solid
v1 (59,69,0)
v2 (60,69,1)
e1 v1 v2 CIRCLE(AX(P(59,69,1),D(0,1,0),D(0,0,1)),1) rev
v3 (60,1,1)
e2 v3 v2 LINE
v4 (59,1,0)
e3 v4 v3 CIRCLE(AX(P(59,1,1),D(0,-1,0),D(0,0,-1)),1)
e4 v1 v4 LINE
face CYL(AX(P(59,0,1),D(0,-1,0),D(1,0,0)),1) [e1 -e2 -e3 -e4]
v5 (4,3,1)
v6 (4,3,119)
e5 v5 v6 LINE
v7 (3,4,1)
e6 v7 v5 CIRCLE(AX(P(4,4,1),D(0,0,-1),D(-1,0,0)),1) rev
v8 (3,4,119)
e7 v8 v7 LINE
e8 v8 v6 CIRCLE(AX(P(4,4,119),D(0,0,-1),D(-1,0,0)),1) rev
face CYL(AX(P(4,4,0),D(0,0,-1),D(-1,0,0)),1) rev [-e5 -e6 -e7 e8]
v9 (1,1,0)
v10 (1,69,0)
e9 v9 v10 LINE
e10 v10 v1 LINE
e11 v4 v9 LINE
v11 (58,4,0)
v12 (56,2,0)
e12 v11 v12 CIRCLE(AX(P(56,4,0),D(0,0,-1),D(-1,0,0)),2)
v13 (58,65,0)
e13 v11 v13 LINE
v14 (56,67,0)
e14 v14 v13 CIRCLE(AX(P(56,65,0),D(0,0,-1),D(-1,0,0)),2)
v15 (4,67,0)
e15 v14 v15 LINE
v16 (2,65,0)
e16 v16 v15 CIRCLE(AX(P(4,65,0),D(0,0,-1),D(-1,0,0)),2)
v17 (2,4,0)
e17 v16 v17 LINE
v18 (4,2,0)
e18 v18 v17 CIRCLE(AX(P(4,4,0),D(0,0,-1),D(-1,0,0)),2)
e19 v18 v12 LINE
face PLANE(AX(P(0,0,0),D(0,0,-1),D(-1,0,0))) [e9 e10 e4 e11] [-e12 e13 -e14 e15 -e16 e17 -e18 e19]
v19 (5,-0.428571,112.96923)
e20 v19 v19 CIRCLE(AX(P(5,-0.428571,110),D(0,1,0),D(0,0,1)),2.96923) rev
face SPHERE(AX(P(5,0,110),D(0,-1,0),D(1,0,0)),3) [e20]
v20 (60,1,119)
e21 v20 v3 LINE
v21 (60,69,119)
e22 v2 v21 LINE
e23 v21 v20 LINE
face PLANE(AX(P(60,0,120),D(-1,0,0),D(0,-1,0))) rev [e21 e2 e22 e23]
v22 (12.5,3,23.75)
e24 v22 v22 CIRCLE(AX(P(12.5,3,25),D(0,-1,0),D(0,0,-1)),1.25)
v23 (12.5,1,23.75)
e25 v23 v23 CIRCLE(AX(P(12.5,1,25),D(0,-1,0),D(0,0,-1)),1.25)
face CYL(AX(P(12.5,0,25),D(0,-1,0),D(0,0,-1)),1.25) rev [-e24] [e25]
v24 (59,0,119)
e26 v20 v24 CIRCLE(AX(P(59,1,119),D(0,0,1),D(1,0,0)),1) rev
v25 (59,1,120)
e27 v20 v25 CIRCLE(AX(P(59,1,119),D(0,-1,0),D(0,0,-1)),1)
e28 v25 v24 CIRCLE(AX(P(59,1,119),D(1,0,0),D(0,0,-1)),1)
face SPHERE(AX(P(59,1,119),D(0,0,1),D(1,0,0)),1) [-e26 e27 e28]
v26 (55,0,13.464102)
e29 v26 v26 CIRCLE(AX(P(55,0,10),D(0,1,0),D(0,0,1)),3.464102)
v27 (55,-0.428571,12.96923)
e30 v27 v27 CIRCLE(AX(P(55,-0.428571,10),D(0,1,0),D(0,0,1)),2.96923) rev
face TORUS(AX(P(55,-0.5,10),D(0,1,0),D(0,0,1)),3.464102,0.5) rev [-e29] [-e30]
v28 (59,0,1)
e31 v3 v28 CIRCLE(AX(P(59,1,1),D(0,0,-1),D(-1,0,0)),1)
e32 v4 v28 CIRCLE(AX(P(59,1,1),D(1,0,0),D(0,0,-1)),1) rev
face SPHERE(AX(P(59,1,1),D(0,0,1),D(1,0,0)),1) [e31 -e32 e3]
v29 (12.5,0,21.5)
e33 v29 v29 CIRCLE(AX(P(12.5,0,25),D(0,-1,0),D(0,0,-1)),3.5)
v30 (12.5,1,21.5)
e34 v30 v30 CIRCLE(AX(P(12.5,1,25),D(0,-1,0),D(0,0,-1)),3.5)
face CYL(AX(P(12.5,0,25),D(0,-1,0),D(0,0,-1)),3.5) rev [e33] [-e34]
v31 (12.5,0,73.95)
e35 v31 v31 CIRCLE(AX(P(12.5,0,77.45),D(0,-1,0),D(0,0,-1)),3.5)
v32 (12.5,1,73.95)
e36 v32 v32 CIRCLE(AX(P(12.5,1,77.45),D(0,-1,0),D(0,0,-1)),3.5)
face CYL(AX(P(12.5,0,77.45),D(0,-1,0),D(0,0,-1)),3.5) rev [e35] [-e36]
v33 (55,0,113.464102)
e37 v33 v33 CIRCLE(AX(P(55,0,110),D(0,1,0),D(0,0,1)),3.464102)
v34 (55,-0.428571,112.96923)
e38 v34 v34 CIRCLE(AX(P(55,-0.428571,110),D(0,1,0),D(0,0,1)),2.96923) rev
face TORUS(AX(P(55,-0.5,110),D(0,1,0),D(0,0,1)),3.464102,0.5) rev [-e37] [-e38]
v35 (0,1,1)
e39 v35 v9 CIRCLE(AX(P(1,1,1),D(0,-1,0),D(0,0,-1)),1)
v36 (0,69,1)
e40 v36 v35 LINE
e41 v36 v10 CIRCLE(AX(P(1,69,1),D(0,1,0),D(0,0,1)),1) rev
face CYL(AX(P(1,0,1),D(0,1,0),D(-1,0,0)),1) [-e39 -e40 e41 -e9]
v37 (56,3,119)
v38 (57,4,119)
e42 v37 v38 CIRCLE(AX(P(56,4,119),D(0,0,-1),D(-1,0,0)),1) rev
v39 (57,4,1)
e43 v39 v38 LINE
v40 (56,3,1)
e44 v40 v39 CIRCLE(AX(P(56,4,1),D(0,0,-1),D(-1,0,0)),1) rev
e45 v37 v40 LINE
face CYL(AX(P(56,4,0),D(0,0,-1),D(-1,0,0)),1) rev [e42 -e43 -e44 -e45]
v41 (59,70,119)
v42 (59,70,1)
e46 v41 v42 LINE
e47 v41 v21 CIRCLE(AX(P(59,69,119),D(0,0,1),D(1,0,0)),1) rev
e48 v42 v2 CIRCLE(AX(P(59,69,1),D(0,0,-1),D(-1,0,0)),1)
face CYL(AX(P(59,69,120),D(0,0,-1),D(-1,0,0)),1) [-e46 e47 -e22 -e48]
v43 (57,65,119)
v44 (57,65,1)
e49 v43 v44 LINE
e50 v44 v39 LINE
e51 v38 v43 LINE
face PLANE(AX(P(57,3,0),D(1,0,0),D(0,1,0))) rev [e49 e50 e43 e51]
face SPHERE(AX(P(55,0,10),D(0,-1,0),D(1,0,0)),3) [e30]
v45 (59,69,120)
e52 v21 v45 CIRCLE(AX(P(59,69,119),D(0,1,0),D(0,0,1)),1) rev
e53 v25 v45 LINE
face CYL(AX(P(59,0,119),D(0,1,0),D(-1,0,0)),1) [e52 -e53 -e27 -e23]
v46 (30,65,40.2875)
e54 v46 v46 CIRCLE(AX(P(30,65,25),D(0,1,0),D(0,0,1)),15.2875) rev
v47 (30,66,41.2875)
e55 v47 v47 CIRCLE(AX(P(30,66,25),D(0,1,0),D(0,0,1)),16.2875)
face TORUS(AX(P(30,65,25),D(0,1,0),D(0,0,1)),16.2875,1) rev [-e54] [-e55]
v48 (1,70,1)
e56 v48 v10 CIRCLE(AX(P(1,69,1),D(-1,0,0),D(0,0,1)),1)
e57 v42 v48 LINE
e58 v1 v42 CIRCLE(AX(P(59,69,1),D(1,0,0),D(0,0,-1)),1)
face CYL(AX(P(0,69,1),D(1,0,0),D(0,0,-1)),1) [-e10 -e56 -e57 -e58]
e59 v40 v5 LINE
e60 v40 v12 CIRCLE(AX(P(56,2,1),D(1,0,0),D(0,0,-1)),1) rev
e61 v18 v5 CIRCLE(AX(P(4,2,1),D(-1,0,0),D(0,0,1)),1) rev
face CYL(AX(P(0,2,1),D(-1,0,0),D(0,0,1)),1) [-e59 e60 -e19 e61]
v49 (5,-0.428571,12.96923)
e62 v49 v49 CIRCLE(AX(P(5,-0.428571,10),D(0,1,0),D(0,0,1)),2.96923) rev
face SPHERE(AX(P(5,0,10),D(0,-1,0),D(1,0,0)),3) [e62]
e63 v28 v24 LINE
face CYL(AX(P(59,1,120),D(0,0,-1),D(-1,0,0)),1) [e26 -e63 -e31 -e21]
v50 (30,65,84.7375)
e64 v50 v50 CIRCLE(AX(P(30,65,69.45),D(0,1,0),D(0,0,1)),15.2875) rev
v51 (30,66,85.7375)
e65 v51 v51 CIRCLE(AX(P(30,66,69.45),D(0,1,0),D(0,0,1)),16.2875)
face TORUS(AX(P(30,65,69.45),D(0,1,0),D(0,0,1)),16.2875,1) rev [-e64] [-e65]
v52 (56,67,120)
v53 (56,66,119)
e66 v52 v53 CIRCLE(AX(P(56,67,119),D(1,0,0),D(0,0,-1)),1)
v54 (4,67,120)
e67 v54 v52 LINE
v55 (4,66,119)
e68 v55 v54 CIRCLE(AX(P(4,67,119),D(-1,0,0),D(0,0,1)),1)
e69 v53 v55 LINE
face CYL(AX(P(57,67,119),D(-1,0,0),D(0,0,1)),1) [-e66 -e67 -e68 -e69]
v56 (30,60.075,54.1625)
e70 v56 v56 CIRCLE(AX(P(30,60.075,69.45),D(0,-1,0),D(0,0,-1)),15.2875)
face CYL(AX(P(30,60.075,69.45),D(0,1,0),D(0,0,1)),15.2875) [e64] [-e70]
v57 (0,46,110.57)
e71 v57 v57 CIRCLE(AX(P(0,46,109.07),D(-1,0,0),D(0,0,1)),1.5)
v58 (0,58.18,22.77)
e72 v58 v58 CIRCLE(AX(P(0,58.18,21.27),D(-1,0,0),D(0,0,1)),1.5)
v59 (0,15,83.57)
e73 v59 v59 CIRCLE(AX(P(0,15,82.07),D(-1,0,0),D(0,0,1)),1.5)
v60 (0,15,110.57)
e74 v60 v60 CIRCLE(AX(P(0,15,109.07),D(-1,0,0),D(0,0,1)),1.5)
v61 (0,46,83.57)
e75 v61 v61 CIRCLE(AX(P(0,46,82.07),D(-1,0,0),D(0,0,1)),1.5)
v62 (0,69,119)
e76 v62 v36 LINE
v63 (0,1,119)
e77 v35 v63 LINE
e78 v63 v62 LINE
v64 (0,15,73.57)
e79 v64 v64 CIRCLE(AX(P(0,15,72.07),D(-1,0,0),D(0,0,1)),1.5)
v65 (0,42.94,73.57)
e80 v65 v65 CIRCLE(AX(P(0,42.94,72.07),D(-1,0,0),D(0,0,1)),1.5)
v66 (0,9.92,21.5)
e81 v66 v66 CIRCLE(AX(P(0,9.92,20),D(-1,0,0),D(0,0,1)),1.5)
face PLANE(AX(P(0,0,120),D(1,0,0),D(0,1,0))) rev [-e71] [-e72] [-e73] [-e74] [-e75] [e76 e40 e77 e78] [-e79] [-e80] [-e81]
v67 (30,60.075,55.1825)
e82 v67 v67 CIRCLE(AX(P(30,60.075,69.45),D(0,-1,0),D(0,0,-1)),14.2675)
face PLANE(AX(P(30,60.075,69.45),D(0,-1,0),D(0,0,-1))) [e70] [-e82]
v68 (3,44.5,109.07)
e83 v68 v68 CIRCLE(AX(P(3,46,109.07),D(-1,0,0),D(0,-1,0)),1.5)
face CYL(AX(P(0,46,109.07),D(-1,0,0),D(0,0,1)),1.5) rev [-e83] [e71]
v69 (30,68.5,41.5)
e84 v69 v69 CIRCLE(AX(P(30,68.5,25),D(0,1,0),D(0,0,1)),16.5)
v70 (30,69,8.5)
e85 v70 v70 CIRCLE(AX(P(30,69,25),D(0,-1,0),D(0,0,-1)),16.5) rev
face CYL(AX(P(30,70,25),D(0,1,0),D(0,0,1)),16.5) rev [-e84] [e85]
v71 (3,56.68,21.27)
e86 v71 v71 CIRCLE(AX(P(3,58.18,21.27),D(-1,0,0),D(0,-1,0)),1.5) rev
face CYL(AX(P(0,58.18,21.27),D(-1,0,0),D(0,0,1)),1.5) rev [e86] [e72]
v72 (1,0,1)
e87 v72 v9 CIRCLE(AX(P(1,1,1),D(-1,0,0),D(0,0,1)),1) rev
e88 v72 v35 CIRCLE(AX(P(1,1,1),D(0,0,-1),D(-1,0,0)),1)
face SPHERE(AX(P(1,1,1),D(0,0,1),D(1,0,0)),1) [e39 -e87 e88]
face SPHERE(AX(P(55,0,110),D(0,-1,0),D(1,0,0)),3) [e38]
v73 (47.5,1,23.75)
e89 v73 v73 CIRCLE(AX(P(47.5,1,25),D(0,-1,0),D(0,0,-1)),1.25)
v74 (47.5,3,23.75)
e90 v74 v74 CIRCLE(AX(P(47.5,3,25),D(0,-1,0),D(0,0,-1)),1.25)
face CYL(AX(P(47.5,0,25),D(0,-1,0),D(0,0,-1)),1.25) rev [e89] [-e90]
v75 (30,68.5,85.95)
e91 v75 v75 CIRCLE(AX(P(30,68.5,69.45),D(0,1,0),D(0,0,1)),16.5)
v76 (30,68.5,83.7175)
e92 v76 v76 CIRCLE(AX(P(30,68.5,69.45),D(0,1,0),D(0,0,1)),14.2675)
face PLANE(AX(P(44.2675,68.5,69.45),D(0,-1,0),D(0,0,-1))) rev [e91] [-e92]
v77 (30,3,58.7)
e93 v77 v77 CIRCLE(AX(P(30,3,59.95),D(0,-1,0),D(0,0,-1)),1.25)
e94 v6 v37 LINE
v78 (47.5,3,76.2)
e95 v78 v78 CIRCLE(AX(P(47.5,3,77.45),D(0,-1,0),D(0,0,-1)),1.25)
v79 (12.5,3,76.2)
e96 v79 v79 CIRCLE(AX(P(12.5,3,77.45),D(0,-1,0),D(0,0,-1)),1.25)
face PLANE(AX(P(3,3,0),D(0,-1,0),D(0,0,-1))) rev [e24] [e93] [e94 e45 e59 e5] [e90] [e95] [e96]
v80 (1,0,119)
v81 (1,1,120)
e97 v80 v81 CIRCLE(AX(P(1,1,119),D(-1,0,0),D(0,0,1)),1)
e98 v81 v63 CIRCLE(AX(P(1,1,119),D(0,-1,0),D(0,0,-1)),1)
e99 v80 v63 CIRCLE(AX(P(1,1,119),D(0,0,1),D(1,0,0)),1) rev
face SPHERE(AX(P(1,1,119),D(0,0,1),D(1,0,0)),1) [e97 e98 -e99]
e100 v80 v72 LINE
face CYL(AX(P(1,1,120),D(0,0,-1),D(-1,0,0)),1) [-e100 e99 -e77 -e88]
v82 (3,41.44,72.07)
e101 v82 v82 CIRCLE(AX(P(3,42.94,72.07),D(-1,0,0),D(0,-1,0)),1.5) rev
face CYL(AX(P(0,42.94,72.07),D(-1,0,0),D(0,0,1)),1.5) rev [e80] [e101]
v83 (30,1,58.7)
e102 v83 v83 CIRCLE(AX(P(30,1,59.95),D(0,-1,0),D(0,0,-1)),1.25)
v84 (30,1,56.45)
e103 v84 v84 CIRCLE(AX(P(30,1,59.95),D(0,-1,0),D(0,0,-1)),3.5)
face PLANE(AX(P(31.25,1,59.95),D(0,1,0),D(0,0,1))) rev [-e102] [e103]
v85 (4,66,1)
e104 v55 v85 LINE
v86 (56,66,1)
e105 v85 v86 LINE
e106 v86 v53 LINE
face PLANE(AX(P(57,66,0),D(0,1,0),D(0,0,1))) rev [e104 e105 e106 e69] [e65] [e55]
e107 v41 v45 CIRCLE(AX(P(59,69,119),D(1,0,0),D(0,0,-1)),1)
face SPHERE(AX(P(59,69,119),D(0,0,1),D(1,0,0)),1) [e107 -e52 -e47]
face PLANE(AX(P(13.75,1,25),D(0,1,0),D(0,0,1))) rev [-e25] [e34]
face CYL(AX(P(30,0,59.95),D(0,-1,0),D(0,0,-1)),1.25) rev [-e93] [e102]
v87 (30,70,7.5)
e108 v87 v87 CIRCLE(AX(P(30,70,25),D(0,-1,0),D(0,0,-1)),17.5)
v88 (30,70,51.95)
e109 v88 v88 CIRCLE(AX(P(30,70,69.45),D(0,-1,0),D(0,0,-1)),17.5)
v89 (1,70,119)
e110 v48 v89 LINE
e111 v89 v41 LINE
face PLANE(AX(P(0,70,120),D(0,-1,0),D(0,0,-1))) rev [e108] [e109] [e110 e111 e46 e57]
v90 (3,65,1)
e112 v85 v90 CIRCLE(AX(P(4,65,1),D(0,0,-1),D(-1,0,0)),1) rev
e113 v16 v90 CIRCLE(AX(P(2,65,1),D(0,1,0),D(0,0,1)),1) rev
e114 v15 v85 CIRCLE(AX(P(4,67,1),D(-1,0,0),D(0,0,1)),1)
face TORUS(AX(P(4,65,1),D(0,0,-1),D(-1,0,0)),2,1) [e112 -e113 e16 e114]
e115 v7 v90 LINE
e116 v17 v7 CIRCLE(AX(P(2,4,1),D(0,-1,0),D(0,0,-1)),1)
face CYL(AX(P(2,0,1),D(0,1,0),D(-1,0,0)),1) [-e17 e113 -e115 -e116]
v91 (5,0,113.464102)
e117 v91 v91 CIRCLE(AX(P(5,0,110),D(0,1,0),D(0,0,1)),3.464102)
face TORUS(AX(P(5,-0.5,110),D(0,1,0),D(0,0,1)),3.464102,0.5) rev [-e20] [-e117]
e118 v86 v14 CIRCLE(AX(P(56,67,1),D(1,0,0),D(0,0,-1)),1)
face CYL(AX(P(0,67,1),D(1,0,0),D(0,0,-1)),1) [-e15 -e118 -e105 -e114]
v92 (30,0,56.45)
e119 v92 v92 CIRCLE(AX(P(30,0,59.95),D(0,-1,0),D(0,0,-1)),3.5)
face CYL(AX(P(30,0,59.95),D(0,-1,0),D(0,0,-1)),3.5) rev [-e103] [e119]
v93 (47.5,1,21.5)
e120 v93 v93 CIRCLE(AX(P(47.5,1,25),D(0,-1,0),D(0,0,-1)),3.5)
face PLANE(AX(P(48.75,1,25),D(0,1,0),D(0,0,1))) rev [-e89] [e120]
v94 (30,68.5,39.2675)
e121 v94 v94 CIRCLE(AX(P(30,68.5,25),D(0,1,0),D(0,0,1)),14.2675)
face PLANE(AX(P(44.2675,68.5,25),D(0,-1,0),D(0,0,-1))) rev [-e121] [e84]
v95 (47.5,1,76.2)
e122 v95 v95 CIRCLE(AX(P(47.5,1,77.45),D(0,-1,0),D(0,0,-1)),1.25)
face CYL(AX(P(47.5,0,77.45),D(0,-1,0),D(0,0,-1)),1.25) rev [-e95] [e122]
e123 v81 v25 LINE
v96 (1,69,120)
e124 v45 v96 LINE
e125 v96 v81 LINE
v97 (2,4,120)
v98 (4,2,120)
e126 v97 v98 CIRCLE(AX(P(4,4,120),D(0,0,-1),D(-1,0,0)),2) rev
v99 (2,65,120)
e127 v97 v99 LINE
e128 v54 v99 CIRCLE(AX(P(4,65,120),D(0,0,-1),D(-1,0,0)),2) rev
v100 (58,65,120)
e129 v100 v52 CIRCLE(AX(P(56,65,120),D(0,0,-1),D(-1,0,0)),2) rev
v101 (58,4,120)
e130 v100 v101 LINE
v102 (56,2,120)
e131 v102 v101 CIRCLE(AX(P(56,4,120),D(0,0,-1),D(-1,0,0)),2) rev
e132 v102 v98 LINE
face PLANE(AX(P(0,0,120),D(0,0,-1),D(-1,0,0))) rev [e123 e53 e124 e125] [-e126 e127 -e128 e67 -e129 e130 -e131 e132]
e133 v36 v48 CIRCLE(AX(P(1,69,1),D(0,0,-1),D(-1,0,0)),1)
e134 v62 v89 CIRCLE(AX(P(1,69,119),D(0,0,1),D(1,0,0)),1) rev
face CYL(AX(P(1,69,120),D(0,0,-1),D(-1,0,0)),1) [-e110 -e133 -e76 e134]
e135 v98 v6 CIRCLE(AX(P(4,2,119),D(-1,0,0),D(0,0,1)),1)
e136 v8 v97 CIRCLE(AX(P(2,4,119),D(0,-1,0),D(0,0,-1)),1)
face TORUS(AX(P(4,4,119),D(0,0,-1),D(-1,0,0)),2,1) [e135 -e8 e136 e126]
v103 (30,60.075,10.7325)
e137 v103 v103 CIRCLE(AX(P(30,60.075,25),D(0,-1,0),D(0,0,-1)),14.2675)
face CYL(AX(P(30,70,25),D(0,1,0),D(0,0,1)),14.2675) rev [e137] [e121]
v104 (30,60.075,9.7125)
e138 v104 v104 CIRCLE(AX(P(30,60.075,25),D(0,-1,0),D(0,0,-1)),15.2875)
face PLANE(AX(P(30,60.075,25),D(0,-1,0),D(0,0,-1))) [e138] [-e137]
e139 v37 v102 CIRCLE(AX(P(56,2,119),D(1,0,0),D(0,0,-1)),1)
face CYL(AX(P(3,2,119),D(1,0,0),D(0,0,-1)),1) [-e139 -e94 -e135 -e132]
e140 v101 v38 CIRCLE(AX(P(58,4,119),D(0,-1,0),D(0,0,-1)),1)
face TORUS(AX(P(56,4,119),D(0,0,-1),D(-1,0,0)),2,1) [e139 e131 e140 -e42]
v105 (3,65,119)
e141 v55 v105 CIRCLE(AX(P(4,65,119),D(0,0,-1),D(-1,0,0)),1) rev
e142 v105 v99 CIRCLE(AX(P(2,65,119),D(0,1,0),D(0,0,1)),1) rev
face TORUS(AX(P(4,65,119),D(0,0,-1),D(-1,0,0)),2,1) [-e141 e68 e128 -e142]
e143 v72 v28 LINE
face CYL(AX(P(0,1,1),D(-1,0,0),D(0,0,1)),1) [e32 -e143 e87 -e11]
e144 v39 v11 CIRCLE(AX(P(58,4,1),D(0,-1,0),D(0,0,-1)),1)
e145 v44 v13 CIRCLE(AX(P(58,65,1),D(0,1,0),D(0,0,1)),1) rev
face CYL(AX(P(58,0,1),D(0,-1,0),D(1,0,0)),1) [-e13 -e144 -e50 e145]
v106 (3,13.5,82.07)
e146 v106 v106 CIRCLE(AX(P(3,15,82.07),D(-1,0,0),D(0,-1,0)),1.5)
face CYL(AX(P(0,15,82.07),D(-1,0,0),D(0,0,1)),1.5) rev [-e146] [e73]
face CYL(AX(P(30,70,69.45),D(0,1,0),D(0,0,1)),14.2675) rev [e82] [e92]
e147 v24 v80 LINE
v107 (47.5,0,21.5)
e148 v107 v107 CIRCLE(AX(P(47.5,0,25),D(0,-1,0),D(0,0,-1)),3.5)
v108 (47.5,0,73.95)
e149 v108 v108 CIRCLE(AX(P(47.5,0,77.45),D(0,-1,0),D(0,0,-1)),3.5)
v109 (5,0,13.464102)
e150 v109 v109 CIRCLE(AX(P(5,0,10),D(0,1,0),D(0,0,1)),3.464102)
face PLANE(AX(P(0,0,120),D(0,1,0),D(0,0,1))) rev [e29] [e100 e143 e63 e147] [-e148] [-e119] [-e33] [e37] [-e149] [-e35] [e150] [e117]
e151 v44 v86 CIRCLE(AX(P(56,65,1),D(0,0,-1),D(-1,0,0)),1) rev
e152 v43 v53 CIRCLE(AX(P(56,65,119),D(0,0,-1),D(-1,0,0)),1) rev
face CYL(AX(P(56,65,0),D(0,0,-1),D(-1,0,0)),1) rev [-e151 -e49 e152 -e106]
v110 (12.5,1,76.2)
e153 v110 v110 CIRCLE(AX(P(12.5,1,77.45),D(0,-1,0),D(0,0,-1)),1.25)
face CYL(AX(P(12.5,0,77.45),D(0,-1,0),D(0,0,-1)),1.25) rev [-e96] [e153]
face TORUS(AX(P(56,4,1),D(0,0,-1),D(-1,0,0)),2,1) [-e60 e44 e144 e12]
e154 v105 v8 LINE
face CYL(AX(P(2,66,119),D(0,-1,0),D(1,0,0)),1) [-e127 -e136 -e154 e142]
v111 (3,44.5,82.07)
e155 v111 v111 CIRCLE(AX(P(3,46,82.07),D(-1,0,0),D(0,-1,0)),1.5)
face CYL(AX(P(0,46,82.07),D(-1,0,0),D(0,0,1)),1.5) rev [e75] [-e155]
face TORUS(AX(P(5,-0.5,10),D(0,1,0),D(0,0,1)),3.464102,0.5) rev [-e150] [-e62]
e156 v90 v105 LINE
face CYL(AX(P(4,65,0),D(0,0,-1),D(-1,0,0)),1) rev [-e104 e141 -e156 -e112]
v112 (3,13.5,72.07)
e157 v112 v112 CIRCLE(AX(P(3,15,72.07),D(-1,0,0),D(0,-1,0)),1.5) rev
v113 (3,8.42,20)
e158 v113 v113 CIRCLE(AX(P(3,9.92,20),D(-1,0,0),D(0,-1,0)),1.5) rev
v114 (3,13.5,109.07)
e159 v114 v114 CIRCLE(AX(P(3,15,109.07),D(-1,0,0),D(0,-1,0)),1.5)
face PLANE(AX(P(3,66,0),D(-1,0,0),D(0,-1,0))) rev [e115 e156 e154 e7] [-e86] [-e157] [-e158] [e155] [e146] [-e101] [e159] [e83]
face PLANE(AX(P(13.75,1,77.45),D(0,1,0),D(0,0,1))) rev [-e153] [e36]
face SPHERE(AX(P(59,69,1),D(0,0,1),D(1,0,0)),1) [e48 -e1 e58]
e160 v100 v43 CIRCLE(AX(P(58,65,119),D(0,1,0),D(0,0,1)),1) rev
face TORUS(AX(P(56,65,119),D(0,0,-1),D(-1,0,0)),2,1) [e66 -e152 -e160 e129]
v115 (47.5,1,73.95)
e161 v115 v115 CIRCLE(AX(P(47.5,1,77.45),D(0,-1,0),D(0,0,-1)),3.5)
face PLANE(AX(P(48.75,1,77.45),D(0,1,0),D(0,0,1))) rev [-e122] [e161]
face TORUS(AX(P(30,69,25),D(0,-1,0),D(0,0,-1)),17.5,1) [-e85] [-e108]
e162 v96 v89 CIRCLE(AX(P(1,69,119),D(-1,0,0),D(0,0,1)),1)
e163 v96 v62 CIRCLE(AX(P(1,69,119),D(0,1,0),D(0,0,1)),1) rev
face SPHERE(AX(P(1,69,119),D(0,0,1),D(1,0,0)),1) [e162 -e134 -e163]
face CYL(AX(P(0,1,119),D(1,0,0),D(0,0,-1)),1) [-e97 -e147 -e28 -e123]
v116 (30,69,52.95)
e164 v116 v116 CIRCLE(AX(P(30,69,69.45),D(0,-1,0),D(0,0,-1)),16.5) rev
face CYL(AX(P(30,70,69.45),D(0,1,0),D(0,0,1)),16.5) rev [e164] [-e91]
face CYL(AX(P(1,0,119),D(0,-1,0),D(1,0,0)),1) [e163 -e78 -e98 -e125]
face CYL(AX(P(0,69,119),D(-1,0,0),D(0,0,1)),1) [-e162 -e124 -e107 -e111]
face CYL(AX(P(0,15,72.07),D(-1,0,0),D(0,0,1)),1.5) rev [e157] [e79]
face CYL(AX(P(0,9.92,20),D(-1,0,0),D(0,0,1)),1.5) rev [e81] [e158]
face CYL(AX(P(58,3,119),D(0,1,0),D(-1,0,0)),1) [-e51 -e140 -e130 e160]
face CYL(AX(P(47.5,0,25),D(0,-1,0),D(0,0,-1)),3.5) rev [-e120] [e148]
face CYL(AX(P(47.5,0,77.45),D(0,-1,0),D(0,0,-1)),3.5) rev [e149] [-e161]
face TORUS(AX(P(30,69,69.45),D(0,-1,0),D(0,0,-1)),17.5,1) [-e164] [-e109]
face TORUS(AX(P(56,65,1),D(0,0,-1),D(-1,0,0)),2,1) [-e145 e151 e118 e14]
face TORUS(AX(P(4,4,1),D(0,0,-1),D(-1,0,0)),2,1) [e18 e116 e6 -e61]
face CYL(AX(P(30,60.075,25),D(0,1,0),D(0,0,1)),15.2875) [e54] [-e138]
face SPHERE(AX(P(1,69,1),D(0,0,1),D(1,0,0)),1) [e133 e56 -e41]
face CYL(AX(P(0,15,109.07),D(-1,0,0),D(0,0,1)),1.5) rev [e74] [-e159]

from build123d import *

# Parameters (mm, degrees)
SKETCH1_W                = 60
SKETCH1_H                = 70
BODYFRAME_DEPTH          = 120
SKETCH2_W                = 54
SKETCH2_H                = 63
SHELL_DEPTH              = 152.327459504
ARDMOUNT_OUTLINE_R       = 1.5
ARDMOUNT_DEPTH           = 3
DVRMOUNT_REACH           = 117.588
DVRMOUNT_BORE_R          = 1.5
DRVRMOUNTS_COUNT         = 2
DRVRMOUNTS_PITCH         = 27
DRVRMOUNTS_COUNT_DIR2    = 2
DRVRMOUNTS_PITCH_DIR2    = 31
STANDS_COUNT             = 2
STANDS_PITCH             = 100
STANDS_COUNT_DIR2        = 2
STANDS_PITCH_DIR2        = 50
SLIPRINGHOLE_OUTLINE_R   = 3.5
SLIPRINGHOLE_DEPTH       = 1
SLIPRINGHOLE_START       = 1
SLIPRINGHOLE_2_OUTLINE_R = 1.25
SLIPRINGHOLE_2_DEPTH     = 2
SLIPRINGHOLES_COUNT      = 2
SLIPRINGHOLES_ANGLE      = 180
MOTHOLE_OUTLINE_R        = 3.5
MOTHOLE_DEPTH            = 1
MOTHOLE_START            = 1
MOTHOLE_2_OUTLINE_R      = 1.25
MOTHOLE_2_DEPTH          = 2
MOTHOLES_COUNT           = 3
MOTHOLES_ANGLE           = 180
SKETCH15_R               = 15.2875
BEARINGSLOTS_DEPTH       = 5.925
BEARINGHOLES_D           = 28.535
BEARINGHOLES_DEPTH       = 9.925
BEARINGHOLES_CBORE_D     = 33
BEARINGHOLES_CBORE_DEPTH = 1.5
FILLET2_R                = 1
FILLET3_R                = 0.5


# Read off the part's stored shape, not the designer's step: Ardmount, SlipringHole, MotHole
with BuildPart() as part:
    # Sketch1 → BodyFrame (new body)
    with BuildSketch(Plane.XY):
        with Locations((30, 35)):
            Rectangle(SKETCH1_W, SKETCH1_H)
    extrude(amount=BODYFRAME_DEPTH)

    # Sketch2 → Shell (cut, through all)
    with BuildSketch(Plane.XY.offset(120)):
        with Locations((30, 34.5)):
            Rectangle(SKETCH2_W, SKETCH2_H)
    extrude(amount=-SHELL_DEPTH, mode=Mode.SUBTRACT)

    # Ardmount outline → Ardmount (cut)
    with BuildSketch(Plane.YZ):
        with Locations((9.92, 20)):
            Circle(ARDMOUNT_OUTLINE_R)
    ardmount = extrude(amount=ARDMOUNT_DEPTH, mode=Mode.SUBTRACT)

    # ArdMountS: Ardmount at 3 more places
    with Locations((0, 48.26, 1.27), (0, 33.02, 52.07), (0, 5.08, 52.07)):
        add(ardmount, mode=Mode.SUBTRACT)

    # DvrMount bore (on position points) → DvrMount (cut, up to next)
    with BuildSketch(Plane(origin=(0, 15, 82.07), x_dir=(0, -1, 0), z_dir=(-1, 0, 0)), mode=Mode.PRIVATE) as dvrmount_sk1:
        Circle(DVRMOUNT_BORE_R)
    dvrmount_tool1 = extrude(dvrmount_sk1.sketch, amount=-DVRMOUNT_REACH, mode=Mode.PRIVATE) & part.part
    dvrmount = dvrmount_tool1.solids().sort_by_distance((0, 15, 82.07))[0]
    add(dvrmount, mode=Mode.SUBTRACT)

    # DrvrMountS: DvrMount 2 × 2
    with Locations(*[(0, j * DRVRMOUNTS_PITCH_DIR2, i * DRVRMOUNTS_PITCH) for i in range(DRVRMOUNTS_COUNT) for j in range(DRVRMOUNTS_COUNT_DIR2) if (i, j) != (0, 0)]):
        add(dvrmount, mode=Mode.SUBTRACT)

    # Sketch6 → Stand (revolve)
    with BuildSketch(Plane(origin=(0, 0, 10), x_dir=(-1, 0, 0), z_dir=(0, 0, -1)), mode=Mode.PRIVATE) as stand_sk:
        with BuildLine():
            Line((-5, -3), (-5, 0))
            Line((-5, 0), (-2, 0))
            ThreePointArc((-2, 0), (-2.878679656, -2.121320344), (-5, -3))
        make_face()
    stand = revolve(stand_sk.sketch.rotate(Axis((5, -3, 10), (0, 1, 0)), 180), axis=Axis((5, -3, 10), (0, 1, 0)))

    # StandS: Stand 2 × 2
    with Locations(*[(j * STANDS_PITCH_DIR2, 0, i * STANDS_PITCH) for i in range(STANDS_COUNT) for j in range(STANDS_COUNT_DIR2) if (i, j) != (0, 0)]):
        add(stand)

    # SlipringHole outline → SlipringHole (cut)
    with BuildSketch(Plane(origin=(0, 0, 0), x_dir=(1, 0, 0), z_dir=(0, 1, 0))):
        with Locations((12.5, -25)):
            Circle(SLIPRINGHOLE_OUTLINE_R)
    slipringhole = extrude(amount=SLIPRINGHOLE_DEPTH, mode=Mode.SUBTRACT)

    # SlipringHole 2 outline → SlipringHole 2 (cut)
    with BuildSketch(Plane(origin=(0, 0, 0), x_dir=(1, 0, 0), z_dir=(0, 1, 0)).offset(SLIPRINGHOLE_START)):
        with Locations((12.5, -25)):
            Circle(SLIPRINGHOLE_2_OUTLINE_R)
    slipringhole_2 = extrude(amount=SLIPRINGHOLE_2_DEPTH, mode=Mode.SUBTRACT)

    # SlipringHoleS: SlipringHole, SlipringHole 2 ×2 about axis
    slipringholes_axis = Axis((30, 0, 25), (0, 1, 0))
    add([slipringhole.rotate(slipringholes_axis, i * SLIPRINGHOLES_ANGLE / (SLIPRINGHOLES_COUNT - 1)) for i in range(1, SLIPRINGHOLES_COUNT)], mode=Mode.SUBTRACT)
    add([slipringhole_2.rotate(slipringholes_axis, i * SLIPRINGHOLES_ANGLE / (SLIPRINGHOLES_COUNT - 1)) for i in range(1, SLIPRINGHOLES_COUNT)], mode=Mode.SUBTRACT)

    # MotHole outline → MotHole (cut)
    with BuildSketch(Plane(origin=(0, 0, 0), x_dir=(1, 0, 0), z_dir=(0, 1, 0))):
        with Locations((12.5, -77.45)):
            Circle(MOTHOLE_OUTLINE_R)
    mothole = extrude(amount=MOTHOLE_DEPTH, mode=Mode.SUBTRACT)

    # MotHole 2 outline → MotHole 2 (cut)
    with BuildSketch(Plane(origin=(0, 0, 0), x_dir=(1, 0, 0), z_dir=(0, 1, 0)).offset(MOTHOLE_START)):
        with Locations((12.5, -77.45)):
            Circle(MOTHOLE_2_OUTLINE_R)
    mothole_2 = extrude(amount=MOTHOLE_2_DEPTH, mode=Mode.SUBTRACT)

    # MotHoleS: MotHole, MotHole 2 ×3 about axis
    motholes_axis = Axis((30, 0, 77.45), (0, -1, 0))
    add([mothole.rotate(motholes_axis, i * MOTHOLES_ANGLE / (MOTHOLES_COUNT - 1)) for i in range(1, MOTHOLES_COUNT)], mode=Mode.SUBTRACT)
    add([mothole_2.rotate(motholes_axis, i * MOTHOLES_ANGLE / (MOTHOLES_COUNT - 1)) for i in range(1, MOTHOLES_COUNT)], mode=Mode.SUBTRACT)

    # Sketch15 → BearingSlots (add)
    with BuildSketch(Plane.XZ.offset(-66)):
        with Locations(Location((30, 25, 0), (0, 0, 90))):
            Circle(SKETCH15_R)
        with Locations(Location((30, 69.45, 0), (0, 0, 90))):
            Circle(SKETCH15_R)
    extrude(amount=BEARINGSLOTS_DEPTH)

    # BearingHoles
    with Locations(Plane(origin=(30, 70, 25), x_dir=(0, 0, 1), z_dir=(0, 1, 0))):
        with Locations((0, 0), (44.45, 0)):
            CounterBoreHole(BEARINGHOLES_D / 2, BEARINGHOLES_CBORE_D / 2, BEARINGHOLES_CBORE_DEPTH, depth=BEARINGHOLES_DEPTH)

    # Fillet2
    fillet2_edges = [part.edges().sort_by_distance(p)[0] for p in [
        (60, 35, 120),
        (30, 70, 120),
        (30, 66, 54.1625),
        (30, 66, 9.7125),
        (30, 70, 52.95),
        (30, 70, 8.5),
        (57, 34.5, 0),
        (57, 66, 60),
        (30, 3, 0),
        (57, 3, 60),
        (3, 34.5, 0),
        (3, 3, 60),
        (30, 66, 0),
        (3, 66, 60),
        (57, 34.5, 120),
        (30, 66, 120),
        (3, 34.5, 120),
        (30, 3, 120),
        (0, 35, 120),
        (30, 70, 0),
        (60, 35, 0),
        (30, 0, 0),
        (0, 35, 0),
        (30, 0, 120),
        (0, 70, 60),
        (60, 70, 60),
        (60, 0, 60),
        (0, 0, 60),
    ]]
    fillet(fillet2_edges, radius=FILLET2_R)

    # Fillet3
    fillet3_edges = [part.edges().sort_by_distance(p)[0] for p in [
        (52, 0, 110),
        (2, 0, 10),
        (52, 0, 10),
        (2, 0, 110),
    ]]
    fillet(fillet3_edges, radius=FILLET3_R)


solid = part.part
